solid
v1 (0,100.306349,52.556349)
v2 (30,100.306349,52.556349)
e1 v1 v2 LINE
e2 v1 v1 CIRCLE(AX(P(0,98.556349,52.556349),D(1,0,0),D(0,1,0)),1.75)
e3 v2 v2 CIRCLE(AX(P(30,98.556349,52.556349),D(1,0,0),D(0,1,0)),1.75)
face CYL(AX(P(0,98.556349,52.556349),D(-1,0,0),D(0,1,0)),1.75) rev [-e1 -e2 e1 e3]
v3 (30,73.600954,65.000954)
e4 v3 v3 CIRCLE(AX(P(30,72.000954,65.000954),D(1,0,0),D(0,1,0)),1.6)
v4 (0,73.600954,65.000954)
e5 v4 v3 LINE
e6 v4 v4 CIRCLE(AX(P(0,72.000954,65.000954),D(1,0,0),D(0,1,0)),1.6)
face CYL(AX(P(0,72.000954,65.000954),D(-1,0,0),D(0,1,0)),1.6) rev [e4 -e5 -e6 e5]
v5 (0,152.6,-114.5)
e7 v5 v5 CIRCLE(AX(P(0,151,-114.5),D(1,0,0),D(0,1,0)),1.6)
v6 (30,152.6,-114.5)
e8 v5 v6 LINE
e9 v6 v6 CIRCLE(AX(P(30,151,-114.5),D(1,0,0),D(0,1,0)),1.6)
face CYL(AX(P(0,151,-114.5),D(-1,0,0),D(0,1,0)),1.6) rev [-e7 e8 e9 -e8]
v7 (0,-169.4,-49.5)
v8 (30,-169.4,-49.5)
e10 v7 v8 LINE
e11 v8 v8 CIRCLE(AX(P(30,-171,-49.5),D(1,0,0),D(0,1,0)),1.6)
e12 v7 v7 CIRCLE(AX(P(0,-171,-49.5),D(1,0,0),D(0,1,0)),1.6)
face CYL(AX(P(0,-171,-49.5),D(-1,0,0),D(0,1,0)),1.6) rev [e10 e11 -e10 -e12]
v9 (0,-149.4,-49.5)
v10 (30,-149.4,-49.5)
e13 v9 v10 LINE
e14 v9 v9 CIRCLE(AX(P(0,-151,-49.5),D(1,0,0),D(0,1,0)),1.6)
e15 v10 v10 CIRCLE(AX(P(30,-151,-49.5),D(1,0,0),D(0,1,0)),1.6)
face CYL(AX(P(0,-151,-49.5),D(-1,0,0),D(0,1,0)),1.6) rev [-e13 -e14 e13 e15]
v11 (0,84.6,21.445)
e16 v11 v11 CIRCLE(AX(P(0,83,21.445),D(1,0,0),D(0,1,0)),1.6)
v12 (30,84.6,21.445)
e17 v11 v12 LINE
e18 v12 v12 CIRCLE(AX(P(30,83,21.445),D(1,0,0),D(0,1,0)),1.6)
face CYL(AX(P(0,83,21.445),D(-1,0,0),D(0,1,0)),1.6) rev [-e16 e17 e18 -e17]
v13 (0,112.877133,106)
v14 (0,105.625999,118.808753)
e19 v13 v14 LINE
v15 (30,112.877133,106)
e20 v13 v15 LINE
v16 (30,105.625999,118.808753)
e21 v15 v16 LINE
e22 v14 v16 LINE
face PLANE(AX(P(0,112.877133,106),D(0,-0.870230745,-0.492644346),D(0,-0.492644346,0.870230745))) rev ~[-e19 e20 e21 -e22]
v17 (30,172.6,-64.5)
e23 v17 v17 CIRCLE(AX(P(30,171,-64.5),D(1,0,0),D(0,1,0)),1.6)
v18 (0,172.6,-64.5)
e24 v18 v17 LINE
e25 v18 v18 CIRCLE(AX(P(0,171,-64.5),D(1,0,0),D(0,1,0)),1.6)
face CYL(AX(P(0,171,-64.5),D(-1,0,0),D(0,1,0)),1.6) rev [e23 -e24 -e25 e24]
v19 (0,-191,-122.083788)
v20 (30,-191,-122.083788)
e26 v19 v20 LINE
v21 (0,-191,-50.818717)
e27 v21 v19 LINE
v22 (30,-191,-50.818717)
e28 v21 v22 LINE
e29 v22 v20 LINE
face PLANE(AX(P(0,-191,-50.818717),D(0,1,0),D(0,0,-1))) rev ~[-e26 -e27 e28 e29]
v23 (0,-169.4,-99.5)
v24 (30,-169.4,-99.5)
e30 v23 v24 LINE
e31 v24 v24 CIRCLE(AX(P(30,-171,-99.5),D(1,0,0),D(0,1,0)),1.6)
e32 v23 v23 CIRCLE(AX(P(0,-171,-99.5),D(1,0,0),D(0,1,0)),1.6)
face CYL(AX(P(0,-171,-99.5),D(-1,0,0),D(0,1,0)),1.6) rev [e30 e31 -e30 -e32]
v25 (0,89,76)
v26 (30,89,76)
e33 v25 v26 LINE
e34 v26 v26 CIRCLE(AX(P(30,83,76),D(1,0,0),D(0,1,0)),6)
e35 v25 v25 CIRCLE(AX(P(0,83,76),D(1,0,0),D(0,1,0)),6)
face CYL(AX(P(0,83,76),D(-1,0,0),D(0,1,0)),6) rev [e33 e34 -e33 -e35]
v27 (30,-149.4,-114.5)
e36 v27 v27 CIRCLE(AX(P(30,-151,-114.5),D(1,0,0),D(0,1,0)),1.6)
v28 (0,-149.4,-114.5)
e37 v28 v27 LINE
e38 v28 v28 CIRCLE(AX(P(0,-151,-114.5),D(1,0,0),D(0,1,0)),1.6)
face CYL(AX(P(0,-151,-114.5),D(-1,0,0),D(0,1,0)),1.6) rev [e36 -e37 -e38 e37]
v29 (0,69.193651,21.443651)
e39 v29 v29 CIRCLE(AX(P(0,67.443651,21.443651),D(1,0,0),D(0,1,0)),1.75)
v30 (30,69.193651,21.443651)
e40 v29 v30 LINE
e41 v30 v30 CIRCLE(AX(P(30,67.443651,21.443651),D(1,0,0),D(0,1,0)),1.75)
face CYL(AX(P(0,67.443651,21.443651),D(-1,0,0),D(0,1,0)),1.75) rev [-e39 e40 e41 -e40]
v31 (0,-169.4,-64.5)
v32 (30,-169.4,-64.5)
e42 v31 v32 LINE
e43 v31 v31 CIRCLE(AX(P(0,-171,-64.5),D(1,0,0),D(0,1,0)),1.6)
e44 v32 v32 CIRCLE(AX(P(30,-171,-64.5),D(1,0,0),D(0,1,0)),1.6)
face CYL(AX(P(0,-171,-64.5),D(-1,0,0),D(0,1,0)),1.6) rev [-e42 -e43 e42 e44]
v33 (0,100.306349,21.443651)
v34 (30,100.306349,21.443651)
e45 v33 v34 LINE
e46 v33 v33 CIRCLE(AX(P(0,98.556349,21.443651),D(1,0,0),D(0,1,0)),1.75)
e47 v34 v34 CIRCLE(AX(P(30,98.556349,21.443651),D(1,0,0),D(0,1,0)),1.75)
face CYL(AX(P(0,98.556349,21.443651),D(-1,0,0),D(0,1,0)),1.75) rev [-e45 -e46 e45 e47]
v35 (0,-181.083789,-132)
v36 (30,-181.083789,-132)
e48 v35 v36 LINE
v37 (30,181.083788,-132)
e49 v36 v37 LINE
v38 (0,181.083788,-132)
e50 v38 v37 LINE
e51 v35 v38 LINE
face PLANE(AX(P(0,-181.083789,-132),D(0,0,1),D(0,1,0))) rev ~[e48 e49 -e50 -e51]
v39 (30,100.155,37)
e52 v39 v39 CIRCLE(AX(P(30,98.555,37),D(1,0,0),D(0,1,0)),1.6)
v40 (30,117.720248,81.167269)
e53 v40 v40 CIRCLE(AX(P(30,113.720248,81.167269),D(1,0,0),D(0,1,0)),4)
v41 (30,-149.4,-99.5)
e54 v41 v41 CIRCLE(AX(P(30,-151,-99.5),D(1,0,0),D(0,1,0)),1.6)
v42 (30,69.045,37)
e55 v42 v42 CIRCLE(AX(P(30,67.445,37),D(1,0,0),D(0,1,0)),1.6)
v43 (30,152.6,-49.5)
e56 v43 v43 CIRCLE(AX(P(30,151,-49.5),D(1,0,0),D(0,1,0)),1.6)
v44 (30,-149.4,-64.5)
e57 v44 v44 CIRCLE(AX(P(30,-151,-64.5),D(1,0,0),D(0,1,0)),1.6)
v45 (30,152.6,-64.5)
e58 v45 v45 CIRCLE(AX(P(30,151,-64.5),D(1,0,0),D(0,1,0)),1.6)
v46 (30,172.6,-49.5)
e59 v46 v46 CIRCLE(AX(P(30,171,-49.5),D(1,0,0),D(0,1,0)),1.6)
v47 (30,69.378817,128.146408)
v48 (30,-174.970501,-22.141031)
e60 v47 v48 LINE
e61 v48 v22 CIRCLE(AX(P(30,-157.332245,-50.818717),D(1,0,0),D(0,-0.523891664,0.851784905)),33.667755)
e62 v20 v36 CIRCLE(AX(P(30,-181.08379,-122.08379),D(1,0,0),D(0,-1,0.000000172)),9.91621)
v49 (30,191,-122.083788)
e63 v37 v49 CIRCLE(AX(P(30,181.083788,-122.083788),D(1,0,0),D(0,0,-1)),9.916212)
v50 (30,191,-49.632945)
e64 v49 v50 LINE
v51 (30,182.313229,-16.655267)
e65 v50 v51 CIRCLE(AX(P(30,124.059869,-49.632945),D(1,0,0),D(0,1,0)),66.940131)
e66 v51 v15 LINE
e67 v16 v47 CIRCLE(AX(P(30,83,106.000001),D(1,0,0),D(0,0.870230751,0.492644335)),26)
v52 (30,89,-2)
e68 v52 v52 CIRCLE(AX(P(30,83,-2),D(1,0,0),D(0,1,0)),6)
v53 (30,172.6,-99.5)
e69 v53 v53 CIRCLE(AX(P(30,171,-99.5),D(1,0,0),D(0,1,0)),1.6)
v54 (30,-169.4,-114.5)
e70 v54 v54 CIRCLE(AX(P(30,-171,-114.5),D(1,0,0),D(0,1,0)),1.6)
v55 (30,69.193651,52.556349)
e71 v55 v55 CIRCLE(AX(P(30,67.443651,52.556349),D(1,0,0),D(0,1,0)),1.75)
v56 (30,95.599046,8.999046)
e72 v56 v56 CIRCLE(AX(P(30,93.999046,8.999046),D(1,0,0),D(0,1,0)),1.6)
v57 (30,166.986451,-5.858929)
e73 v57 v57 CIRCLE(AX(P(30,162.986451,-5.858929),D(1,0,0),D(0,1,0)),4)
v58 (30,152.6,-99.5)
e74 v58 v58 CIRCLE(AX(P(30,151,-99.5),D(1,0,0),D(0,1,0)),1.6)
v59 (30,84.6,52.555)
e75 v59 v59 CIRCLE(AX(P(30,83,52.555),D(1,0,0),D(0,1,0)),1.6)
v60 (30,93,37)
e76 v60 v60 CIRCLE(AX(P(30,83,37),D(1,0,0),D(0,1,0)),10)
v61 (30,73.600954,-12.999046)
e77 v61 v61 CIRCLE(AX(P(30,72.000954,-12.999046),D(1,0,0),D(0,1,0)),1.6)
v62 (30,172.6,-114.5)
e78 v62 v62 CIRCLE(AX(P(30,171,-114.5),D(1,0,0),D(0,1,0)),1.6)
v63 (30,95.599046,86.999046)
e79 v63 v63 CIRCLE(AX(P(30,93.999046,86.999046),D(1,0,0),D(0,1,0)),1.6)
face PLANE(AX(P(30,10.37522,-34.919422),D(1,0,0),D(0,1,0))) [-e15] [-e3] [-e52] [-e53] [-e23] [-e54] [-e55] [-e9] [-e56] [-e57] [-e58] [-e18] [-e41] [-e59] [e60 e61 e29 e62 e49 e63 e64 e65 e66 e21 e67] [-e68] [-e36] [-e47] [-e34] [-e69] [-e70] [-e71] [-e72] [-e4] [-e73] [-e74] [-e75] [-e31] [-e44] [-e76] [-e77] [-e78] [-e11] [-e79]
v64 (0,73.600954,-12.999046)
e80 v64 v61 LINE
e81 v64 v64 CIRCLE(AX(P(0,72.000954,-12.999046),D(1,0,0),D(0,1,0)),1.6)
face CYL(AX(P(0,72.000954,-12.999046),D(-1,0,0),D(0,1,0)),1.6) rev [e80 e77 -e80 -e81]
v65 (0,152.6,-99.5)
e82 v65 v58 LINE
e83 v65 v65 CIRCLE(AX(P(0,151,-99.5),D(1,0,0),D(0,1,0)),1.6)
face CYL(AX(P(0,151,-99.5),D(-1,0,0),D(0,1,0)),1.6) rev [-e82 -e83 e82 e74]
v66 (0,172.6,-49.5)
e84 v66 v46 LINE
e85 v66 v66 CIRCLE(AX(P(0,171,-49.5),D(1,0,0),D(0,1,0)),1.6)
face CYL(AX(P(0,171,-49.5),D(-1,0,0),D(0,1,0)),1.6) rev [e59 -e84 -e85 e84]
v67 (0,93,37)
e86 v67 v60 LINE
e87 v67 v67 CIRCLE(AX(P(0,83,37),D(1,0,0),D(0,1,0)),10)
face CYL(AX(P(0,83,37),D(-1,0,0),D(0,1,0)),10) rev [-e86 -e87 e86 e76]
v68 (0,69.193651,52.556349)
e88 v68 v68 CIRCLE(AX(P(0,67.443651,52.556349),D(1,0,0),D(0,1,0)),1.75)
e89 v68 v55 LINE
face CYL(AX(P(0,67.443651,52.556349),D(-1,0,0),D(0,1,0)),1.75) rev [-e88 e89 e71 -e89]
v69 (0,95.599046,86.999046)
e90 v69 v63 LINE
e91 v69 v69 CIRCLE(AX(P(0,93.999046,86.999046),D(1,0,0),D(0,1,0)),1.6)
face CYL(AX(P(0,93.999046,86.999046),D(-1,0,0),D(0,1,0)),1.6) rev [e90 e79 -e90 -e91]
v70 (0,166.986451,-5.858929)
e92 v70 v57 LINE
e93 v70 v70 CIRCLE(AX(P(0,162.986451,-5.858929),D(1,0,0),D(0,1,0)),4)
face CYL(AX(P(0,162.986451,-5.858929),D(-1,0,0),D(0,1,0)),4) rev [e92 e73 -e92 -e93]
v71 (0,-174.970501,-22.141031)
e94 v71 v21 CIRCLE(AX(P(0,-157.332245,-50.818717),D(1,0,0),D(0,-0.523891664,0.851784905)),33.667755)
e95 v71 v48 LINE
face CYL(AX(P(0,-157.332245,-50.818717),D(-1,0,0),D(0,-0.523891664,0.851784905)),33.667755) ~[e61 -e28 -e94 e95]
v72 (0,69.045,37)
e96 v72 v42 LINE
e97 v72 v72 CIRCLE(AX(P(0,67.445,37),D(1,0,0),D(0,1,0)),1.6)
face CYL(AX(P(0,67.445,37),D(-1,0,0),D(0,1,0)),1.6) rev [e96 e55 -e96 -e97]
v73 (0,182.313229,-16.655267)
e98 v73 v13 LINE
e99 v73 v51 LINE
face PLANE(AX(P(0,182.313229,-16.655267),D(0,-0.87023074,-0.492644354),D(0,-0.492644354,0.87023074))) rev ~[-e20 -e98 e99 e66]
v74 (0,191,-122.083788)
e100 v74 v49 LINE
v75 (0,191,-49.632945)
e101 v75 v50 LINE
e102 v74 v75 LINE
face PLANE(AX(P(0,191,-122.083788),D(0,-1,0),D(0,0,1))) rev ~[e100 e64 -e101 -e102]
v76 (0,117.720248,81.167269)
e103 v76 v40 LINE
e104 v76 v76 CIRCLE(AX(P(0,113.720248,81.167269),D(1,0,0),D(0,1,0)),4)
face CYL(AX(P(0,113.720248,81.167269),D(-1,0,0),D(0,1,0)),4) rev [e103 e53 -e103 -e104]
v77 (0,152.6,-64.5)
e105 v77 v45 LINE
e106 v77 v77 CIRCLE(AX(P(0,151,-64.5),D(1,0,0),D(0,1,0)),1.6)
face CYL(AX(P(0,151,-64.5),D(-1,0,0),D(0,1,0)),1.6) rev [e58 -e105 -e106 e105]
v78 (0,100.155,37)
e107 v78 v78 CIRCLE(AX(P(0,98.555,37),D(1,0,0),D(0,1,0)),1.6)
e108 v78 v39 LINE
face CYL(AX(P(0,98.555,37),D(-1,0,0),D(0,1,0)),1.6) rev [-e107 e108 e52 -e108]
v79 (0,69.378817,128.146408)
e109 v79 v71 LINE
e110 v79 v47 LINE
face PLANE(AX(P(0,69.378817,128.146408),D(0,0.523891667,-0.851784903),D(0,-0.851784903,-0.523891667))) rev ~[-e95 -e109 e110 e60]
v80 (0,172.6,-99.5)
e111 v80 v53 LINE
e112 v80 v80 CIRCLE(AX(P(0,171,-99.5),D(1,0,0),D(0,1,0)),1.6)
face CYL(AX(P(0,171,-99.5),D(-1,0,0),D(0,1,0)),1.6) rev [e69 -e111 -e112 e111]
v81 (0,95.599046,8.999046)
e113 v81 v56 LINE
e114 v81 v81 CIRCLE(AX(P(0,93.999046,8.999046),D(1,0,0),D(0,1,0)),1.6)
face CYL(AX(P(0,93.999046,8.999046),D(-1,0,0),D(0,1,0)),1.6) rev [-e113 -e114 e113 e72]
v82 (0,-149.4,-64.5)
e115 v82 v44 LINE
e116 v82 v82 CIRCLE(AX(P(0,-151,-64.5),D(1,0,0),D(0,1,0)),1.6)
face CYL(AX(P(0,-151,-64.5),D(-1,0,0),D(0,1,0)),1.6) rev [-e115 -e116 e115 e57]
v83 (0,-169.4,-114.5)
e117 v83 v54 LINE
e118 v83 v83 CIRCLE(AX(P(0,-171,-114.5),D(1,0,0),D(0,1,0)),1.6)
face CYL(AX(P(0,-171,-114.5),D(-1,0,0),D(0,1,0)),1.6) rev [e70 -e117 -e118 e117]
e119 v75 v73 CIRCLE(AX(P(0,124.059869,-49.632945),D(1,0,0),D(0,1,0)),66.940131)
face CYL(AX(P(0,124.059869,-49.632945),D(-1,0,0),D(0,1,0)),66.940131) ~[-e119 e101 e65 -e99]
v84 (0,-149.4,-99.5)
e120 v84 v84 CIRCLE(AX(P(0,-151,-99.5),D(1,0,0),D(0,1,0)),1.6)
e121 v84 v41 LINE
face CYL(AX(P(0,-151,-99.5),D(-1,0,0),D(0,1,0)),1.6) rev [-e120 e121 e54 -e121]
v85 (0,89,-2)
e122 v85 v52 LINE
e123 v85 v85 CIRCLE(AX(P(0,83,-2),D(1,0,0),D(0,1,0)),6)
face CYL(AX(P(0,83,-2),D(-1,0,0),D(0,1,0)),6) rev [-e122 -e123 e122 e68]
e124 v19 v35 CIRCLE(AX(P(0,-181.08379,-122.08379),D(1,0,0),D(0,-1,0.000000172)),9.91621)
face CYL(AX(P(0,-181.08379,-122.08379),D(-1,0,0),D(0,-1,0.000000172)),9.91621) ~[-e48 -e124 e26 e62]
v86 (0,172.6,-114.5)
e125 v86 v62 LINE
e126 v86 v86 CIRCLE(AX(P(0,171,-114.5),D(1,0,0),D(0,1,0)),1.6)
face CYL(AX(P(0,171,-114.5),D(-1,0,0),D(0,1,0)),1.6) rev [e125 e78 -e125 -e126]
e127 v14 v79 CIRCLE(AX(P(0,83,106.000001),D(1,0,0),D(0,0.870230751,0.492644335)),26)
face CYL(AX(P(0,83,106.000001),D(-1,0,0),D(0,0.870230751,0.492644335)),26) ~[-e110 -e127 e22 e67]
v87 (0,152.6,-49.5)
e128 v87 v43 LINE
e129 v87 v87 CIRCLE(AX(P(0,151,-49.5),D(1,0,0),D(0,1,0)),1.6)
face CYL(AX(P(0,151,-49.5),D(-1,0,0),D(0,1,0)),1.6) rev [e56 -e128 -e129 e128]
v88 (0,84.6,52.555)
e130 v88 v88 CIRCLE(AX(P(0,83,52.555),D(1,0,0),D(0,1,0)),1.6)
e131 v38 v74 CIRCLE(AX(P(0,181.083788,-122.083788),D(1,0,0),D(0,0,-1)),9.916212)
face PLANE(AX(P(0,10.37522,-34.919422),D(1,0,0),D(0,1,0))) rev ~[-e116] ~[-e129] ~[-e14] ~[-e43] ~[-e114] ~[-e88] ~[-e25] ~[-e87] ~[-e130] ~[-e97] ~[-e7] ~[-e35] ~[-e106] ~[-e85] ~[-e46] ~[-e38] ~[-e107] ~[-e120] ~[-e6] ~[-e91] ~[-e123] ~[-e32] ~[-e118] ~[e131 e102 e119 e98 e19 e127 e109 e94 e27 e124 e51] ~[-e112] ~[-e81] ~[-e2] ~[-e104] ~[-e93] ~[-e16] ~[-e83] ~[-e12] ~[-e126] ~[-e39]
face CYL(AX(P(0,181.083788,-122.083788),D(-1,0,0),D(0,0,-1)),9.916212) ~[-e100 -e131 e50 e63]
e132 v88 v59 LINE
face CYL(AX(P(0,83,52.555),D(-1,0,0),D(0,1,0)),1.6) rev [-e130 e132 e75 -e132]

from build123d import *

# Parameters (mm, degrees)
F0_R     = 1.6
F0_R_2   = 6
F0_R_3   = 4
F0_R_4   = 1.75
F0_R_5   = 10
F1_DEPTH = 30


# Not quite as in the source:
# - ends of sketch curves that miss each other by under 0.0002 mm in the source are joined


with BuildPart() as f1:
    # F0 (on Right) → F1 (new body)
    with BuildSketch(Plane.YZ):
        with BuildLine():
            Line((191, -122.083788), (191, -49.632945))
            ThreePointArc((191, -49.632945), (188.7918883648, -32.5816457168), (182.3132286148, -16.6552672181))
            Line((182.3132286148, -16.6552672181), (112.877133, 106))
            Line((112.877133, 106), (105.625999, 118.808753))
            ThreePointArc((105.625999, 118.808753), (89.4861101441, 131.177974009), (69.378816691, 128.1464075024))
            Line((69.378816691, 128.1464075024), (-174.970501, -22.141031))
            ThreePointArc((-174.970501, -22.141031), (-186.7206628889, -34.3919513631), (-191, -50.818717))
            Line((-191, -50.818717), (-191, -122.083788))
            ThreePointArc((-191, -122.083788), (-188.0956097489, -129.0956087489), (-181.083789, -132))
            Line((-181.083789, -132), (83, -132))
            Line((83, -132), (181.083788, -132))
            ThreePointArc((181.083788, -132), (188.0956087489, -129.0956087489), (191, -122.083788))
        make_face()
        with Locations((-171, -114.5)):
            Circle(F0_R, mode=Mode.SUBTRACT)
        with Locations((-171, -99.5)):
            Circle(F0_R, mode=Mode.SUBTRACT)
        with Locations((-151, -114.5)):
            Circle(F0_R, mode=Mode.SUBTRACT)
        with Locations((-151, -99.5)):
            Circle(F0_R, mode=Mode.SUBTRACT)
        with Locations((-171, -64.5)):
            Circle(F0_R, mode=Mode.SUBTRACT)
        with Locations((-151, -64.5)):
            Circle(F0_R, mode=Mode.SUBTRACT)
        with Locations((-171, -49.5)):
            Circle(F0_R, mode=Mode.SUBTRACT)
        with Locations((-151, -49.5)):
            Circle(F0_R, mode=Mode.SUBTRACT)
        with Locations((151, -114.5)):
            Circle(F0_R, mode=Mode.SUBTRACT)
        with Locations((151, -99.5)):
            Circle(F0_R, mode=Mode.SUBTRACT)
        with Locations((171, -114.5)):
            Circle(F0_R, mode=Mode.SUBTRACT)
        with Locations((171, -99.5)):
            Circle(F0_R, mode=Mode.SUBTRACT)
        with Locations((72.000954, -12.999046)):
            Circle(F0_R, mode=Mode.SUBTRACT)
        with Locations((83, -2)):
            Circle(F0_R_2, mode=Mode.SUBTRACT)
        with Locations((151, -64.5)):
            Circle(F0_R, mode=Mode.SUBTRACT)
        with Locations((171, -64.5)):
            Circle(F0_R, mode=Mode.SUBTRACT)
        with Locations((151, -49.5)):
            Circle(F0_R, mode=Mode.SUBTRACT)
        with Locations((171, -49.5)):
            Circle(F0_R, mode=Mode.SUBTRACT)
        with Locations((162.986451, -5.858929)):
            Circle(F0_R_3, mode=Mode.SUBTRACT)
        with Locations((93.999046, 8.999046)):
            Circle(F0_R, mode=Mode.SUBTRACT)
        with Locations((67.443651, 21.443651)):
            Circle(F0_R_4, mode=Mode.SUBTRACT)
        with Locations((83, 21.445)):
            Circle(F0_R, mode=Mode.SUBTRACT)
        with Locations((67.445, 37)):
            Circle(F0_R, mode=Mode.SUBTRACT)
        with Locations((83, 37)):
            Circle(F0_R_5, mode=Mode.SUBTRACT)
        with Locations((67.443651, 52.556349)):
            Circle(F0_R_4, mode=Mode.SUBTRACT)
        with Locations((83, 52.555)):
            Circle(F0_R, mode=Mode.SUBTRACT)
        with Locations((72.000954, 65.000954)):
            Circle(F0_R, mode=Mode.SUBTRACT)
        with Locations((98.556349, 21.443651)):
            Circle(F0_R_4, mode=Mode.SUBTRACT)
        with Locations((98.555, 37)):
            Circle(F0_R, mode=Mode.SUBTRACT)
        with Locations((98.556349, 52.556349)):
            Circle(F0_R_4, mode=Mode.SUBTRACT)
        with Locations((83, 76)):
            Circle(F0_R_2, mode=Mode.SUBTRACT)
        with Locations((93.999046, 86.999046)):
            Circle(F0_R, mode=Mode.SUBTRACT)
        with Locations((113.720248, 81.167269)):
            Circle(F0_R_3, mode=Mode.SUBTRACT)
    extrude(amount=F1_DEPTH)


solid = f1.part
